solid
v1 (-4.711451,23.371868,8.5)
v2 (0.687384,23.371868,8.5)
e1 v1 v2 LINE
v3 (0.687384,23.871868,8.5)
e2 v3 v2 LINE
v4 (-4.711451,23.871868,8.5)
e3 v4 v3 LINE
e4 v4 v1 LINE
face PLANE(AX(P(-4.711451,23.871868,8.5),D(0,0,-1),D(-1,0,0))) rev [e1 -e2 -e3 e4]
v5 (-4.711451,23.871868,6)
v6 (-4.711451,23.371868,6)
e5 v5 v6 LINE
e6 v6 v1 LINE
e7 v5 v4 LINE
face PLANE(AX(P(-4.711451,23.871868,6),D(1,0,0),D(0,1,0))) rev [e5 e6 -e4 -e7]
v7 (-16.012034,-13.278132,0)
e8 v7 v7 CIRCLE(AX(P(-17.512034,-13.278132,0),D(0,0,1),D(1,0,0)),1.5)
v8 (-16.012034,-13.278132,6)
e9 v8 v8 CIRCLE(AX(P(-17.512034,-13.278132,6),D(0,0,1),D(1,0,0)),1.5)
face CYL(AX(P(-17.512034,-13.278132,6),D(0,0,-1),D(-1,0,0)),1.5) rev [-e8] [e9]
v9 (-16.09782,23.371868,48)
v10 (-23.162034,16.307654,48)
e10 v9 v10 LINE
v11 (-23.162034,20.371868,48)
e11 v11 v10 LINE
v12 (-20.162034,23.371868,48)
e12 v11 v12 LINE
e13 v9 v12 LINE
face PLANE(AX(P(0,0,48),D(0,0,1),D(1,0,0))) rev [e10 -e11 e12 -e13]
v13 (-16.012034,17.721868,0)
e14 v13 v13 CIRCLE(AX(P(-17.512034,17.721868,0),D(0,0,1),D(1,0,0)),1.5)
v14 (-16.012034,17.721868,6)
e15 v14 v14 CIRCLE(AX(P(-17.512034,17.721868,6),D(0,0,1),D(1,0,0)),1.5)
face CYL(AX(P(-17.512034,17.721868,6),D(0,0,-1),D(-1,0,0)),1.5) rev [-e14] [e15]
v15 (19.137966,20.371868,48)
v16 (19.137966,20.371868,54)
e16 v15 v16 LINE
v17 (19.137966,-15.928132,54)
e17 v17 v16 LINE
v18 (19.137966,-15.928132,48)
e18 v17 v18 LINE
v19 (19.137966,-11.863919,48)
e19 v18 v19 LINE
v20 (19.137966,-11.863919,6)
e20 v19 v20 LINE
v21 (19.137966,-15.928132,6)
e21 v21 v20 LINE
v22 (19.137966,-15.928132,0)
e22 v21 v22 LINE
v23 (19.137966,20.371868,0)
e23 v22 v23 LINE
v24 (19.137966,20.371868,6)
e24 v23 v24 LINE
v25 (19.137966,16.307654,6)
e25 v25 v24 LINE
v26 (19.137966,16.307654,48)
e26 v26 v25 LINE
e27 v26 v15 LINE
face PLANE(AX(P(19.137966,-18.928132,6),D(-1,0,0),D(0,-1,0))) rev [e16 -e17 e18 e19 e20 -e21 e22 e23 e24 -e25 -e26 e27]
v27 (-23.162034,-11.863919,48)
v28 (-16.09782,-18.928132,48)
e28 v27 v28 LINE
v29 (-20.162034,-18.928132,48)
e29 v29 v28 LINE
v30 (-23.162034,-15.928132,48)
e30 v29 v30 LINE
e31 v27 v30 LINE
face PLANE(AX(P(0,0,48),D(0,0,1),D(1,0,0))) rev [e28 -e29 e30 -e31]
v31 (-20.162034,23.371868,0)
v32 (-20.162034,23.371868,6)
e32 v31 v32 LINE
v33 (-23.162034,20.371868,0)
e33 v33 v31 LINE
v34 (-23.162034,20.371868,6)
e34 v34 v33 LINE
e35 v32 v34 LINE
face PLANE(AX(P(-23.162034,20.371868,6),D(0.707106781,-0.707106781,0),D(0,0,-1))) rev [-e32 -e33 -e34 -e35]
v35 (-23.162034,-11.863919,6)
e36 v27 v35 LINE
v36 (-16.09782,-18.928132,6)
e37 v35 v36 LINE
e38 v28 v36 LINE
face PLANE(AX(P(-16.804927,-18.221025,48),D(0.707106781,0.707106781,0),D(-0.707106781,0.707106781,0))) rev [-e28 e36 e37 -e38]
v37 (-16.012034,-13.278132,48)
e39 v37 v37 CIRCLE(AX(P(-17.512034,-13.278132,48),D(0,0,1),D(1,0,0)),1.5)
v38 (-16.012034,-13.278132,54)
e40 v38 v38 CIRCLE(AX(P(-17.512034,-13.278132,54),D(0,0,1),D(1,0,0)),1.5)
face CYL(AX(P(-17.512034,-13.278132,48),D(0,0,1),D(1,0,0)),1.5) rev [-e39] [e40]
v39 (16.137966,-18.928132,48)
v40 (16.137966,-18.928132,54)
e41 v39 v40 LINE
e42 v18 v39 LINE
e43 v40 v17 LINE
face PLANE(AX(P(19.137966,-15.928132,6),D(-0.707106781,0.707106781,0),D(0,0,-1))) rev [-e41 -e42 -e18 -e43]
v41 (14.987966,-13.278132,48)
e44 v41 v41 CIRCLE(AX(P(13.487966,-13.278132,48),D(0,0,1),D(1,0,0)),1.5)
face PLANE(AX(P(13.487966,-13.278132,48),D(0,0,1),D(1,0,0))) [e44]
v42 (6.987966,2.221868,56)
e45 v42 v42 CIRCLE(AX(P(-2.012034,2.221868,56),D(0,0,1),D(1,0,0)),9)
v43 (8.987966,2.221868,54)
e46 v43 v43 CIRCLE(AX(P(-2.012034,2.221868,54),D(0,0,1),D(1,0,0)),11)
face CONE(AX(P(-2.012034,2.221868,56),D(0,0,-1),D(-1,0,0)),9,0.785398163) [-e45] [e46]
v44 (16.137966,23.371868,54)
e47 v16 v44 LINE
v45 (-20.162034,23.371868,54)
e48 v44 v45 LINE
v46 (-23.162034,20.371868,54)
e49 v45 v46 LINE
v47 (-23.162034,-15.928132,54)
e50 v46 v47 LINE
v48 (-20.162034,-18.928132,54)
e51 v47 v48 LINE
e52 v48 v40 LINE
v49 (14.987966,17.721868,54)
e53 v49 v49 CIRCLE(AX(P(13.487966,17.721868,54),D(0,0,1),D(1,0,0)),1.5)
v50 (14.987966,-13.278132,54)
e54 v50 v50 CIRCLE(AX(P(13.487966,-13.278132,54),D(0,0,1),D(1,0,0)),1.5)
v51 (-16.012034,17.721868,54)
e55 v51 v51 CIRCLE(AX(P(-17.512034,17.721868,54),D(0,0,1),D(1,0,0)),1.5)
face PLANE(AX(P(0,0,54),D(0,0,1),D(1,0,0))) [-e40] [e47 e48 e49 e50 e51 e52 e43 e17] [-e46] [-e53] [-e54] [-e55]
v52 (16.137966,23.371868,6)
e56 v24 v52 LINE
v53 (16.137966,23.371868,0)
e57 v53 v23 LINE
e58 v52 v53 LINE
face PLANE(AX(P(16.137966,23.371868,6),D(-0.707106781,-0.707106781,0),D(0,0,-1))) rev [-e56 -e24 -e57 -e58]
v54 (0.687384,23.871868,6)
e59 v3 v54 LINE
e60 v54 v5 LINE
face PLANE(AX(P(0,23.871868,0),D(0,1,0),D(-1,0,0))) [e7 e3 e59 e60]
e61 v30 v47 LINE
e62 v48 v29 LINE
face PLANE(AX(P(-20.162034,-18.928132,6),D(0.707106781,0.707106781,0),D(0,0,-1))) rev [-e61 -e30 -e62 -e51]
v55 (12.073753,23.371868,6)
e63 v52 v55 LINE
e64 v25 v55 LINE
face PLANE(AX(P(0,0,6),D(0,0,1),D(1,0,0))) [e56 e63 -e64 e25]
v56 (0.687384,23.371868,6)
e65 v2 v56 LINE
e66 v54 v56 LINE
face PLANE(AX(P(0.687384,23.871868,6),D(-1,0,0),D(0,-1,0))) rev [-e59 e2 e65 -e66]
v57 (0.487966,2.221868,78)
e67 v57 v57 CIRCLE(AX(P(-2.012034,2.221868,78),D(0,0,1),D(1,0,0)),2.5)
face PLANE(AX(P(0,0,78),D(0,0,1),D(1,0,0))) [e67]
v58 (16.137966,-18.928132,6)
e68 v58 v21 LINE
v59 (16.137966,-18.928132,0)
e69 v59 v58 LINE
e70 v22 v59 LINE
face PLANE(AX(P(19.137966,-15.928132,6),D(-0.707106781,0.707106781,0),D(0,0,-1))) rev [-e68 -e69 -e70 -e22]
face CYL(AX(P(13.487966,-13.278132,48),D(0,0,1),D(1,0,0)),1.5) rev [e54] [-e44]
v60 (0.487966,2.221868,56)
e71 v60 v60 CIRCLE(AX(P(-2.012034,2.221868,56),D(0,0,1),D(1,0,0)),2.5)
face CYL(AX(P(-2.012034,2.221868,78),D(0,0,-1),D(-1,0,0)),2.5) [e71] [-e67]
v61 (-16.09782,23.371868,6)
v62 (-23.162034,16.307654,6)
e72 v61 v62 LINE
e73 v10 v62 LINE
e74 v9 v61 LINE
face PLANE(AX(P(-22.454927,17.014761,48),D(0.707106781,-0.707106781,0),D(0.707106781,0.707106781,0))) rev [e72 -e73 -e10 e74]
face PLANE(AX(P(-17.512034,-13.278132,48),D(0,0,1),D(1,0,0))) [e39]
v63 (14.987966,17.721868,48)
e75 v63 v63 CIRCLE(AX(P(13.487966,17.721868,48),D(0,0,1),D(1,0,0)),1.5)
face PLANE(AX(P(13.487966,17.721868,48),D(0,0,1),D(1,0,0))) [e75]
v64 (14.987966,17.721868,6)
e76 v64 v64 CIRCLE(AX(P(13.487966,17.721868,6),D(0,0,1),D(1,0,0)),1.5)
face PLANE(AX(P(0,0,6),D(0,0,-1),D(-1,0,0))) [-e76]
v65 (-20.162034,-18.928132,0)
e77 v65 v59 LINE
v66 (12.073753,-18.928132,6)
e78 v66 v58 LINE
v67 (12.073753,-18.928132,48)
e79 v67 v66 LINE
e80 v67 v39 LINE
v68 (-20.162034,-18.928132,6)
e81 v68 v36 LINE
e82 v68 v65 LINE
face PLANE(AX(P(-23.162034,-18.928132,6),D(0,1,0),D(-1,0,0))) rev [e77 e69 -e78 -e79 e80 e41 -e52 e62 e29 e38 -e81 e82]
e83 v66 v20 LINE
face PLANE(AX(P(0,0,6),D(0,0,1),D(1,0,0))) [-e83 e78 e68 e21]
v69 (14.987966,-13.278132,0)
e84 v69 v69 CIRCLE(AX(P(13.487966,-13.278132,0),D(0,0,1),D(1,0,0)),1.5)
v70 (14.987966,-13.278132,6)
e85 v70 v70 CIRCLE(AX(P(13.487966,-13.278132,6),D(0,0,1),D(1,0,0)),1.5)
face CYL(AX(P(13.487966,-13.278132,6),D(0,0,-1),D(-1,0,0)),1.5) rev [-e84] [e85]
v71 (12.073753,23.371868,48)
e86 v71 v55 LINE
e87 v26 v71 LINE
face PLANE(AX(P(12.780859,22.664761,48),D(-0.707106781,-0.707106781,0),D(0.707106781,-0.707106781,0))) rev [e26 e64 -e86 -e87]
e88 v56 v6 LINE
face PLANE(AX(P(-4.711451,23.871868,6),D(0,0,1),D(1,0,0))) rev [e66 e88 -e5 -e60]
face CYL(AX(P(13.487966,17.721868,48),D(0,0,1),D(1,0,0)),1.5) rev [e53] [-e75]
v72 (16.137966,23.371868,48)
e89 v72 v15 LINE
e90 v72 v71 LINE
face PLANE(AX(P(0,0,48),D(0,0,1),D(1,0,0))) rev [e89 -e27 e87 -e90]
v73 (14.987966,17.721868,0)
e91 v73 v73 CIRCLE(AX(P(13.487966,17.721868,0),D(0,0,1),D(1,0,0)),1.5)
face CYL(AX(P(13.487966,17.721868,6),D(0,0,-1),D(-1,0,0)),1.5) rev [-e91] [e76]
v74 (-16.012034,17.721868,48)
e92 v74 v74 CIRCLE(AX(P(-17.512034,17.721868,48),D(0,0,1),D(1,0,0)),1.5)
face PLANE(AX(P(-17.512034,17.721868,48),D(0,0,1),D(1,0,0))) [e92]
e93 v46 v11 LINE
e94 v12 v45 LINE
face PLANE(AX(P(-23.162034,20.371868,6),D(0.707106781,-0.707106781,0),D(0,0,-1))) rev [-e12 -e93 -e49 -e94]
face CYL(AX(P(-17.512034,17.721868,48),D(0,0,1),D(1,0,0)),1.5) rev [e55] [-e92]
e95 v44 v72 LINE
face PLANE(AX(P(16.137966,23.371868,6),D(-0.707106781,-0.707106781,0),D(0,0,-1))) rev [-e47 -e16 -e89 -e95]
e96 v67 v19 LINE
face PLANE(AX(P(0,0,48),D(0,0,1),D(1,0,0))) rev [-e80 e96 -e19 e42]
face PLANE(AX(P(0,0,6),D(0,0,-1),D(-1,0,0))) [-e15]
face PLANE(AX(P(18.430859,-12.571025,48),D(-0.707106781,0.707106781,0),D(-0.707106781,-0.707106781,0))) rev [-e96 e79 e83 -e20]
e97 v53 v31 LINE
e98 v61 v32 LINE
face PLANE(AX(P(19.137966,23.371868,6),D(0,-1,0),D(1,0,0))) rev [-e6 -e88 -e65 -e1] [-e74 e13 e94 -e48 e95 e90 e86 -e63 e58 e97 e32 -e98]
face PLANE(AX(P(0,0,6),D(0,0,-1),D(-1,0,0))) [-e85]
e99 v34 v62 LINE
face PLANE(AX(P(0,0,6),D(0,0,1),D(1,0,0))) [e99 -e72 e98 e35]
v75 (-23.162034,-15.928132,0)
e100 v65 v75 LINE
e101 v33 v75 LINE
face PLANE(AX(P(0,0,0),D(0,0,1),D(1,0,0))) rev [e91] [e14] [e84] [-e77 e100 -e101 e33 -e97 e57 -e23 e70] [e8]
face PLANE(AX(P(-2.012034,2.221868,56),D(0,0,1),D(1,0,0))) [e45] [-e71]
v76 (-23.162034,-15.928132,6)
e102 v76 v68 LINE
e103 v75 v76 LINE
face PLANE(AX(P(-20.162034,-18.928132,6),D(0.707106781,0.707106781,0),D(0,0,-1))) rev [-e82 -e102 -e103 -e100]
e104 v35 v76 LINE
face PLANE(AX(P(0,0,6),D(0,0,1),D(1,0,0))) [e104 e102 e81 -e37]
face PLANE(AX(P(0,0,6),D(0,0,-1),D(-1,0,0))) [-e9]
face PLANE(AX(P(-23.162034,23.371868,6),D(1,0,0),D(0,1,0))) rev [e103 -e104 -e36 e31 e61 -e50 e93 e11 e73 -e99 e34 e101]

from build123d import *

# Parameters (mm, degrees)
SKETCH_1_W          = 42.3
SKETCH_1_H          = 42.3
SKETCH_1_R          = 1.5
EXTRUDE_1_DEPTH     = 6
EXTRUDE_2_DEPTH     = 42
SKETCH_3_W          = 42.3
SKETCH_3_H          = 42.3
EXTRUDE_3_DEPTH     = 6
SKETCH_4_R          = 2.5
EXTRUDE_4_DEPTH     = 24
SKETCH_4_3_R        = 11
SKETCH_4_3_R_2      = 2.5
EXTRUDE_5_DEPTH     = 2
CHAMFER_1_SIZE      = 3
CUT_EXTRUDE_START   = -6
SKETCH_5_R          = 1.5
CUT_EXTRUDE_1_DEPTH = 6
SKETCH_6_W          = 5.398834963
SKETCH_6_H          = 2.5
EXTRUDE_6_DEPTH     = 0.5
CHAMFER_2_SIZE      = 2


with BuildPart() as part:
    # 草图1 → 凸台-拉伸1 (new body)
    with BuildSketch(Plane.XY):
        with Locations((-2.012033722, 2.221867738)):
            Rectangle(SKETCH_1_W, SKETCH_1_H)
        with Locations((-17.512033722, 17.721867738)):
            Circle(SKETCH_1_R, mode=Mode.SUBTRACT)
        with Locations((13.487966278, 17.721867738)):
            Circle(SKETCH_1_R, mode=Mode.SUBTRACT)
        with Locations((-17.512033722, -13.278132262)):
            Circle(SKETCH_1_R, mode=Mode.SUBTRACT)
        with Locations((13.487966278, -13.278132262)):
            Circle(SKETCH_1_R, mode=Mode.SUBTRACT)
    extrude(amount=EXTRUDE_1_DEPTH)

    # 草图2 → 凸台-拉伸2 (add)
    with BuildSketch(Plane.XY.offset(6)):
        Polygon((-16.804926941, -18.221025481), (-22.454926941, -12.571025481), (-23.162033722, -11.8639187), (-23.162033722, 16.307654175), (-22.454926941, 17.014760956), (-16.804926941, 22.664760956), (-16.09782016, 23.371867738), (12.073752715, 23.371867738), (12.780859496, 22.664760956), (18.430859496, 17.014760956), (19.137966278, 16.307654175), (19.137966278, -11.8639187), (18.430859496, -12.571025481), (12.780859496, -18.221025481), (12.073752715, -18.928132262), (-16.09782016, -18.928132262), align=None)
    extrude(amount=EXTRUDE_2_DEPTH)

    # 草图3 → 凸台-拉伸3 (add)
    with BuildSketch(Plane.XY.offset(48)):
        with Locations((-2.012033722, 2.221867738)):
            Rectangle(SKETCH_3_W, SKETCH_3_H)
    extrude(amount=EXTRUDE_3_DEPTH)

    # 草图4 → 凸台-拉伸4 (add)
    with BuildSketch(Plane.XY.offset(54)):
        with Locations((-2.012033722, 2.221867738)):
            Circle(SKETCH_4_R)
    extrude(amount=EXTRUDE_4_DEPTH)

    # 草图4<3> → 凸台-拉伸5 (add)
    with BuildSketch(Plane.XY.offset(54)):
        with Locations((-2.012033722, 2.221867738)):
            Circle(SKETCH_4_3_R)
        with Locations((-2.012033722, 2.221867738)):
            Circle(SKETCH_4_3_R_2, mode=Mode.SUBTRACT)
    extrude(amount=EXTRUDE_5_DEPTH)

    # 倒角1
    chamfer_1_edges = [part.edges().sort_by_distance(p)[0] for p in [
        (-23.162033722, -18.928132262, 51),
        (-23.162033722, -18.928132262, 3),
        (19.137966278, -18.928132262, 51),
        (19.137966278, -18.928132262, 3),
        (19.137966278, 23.371867738, 51),
        (19.137966278, 23.371867738, 3),
        (-23.162033722, 23.371867738, 51),
        (-23.162033722, 23.371867738, 3),
    ]]
    chamfer(chamfer_1_edges, length=CHAMFER_1_SIZE)

    # 草图5 → 切除-拉伸1 (cut)
    with BuildSketch(Plane.XY.offset(54).offset(CUT_EXTRUDE_START)):
        with Locations((-17.512033722, 17.721867738)):
            Circle(SKETCH_5_R)
        with Locations((13.487966278, 17.721867738)):
            Circle(SKETCH_5_R)
        with Locations((13.487966278, -13.278132262)):
            Circle(SKETCH_5_R)
        with Locations((-17.512033722, -13.278132262)):
            Circle(SKETCH_5_R)
    extrude(amount=CUT_EXTRUDE_1_DEPTH, mode=Mode.SUBTRACT)

    # 草图6 → 凸台-拉伸6 (add)
    with BuildSketch(Plane(origin=(0, 23.371867738, 0), x_dir=(1, 0, 0), z_dir=(0, 1, 0))):
        with Locations((-2.012033723, -7.25)):
            Rectangle(SKETCH_6_W, SKETCH_6_H)
    extrude(amount=EXTRUDE_6_DEPTH)

    # 倒角2
    chamfer_2_edges = [part.edges().sort_by_distance(p)[0] for p in [
        (-13.012033722, 2.221867738, 56),
    ]]
    chamfer(chamfer_2_edges, length=CHAMFER_2_SIZE - 0.0001)  # a hair under: the kernel refuses the full size


solid = part.part
